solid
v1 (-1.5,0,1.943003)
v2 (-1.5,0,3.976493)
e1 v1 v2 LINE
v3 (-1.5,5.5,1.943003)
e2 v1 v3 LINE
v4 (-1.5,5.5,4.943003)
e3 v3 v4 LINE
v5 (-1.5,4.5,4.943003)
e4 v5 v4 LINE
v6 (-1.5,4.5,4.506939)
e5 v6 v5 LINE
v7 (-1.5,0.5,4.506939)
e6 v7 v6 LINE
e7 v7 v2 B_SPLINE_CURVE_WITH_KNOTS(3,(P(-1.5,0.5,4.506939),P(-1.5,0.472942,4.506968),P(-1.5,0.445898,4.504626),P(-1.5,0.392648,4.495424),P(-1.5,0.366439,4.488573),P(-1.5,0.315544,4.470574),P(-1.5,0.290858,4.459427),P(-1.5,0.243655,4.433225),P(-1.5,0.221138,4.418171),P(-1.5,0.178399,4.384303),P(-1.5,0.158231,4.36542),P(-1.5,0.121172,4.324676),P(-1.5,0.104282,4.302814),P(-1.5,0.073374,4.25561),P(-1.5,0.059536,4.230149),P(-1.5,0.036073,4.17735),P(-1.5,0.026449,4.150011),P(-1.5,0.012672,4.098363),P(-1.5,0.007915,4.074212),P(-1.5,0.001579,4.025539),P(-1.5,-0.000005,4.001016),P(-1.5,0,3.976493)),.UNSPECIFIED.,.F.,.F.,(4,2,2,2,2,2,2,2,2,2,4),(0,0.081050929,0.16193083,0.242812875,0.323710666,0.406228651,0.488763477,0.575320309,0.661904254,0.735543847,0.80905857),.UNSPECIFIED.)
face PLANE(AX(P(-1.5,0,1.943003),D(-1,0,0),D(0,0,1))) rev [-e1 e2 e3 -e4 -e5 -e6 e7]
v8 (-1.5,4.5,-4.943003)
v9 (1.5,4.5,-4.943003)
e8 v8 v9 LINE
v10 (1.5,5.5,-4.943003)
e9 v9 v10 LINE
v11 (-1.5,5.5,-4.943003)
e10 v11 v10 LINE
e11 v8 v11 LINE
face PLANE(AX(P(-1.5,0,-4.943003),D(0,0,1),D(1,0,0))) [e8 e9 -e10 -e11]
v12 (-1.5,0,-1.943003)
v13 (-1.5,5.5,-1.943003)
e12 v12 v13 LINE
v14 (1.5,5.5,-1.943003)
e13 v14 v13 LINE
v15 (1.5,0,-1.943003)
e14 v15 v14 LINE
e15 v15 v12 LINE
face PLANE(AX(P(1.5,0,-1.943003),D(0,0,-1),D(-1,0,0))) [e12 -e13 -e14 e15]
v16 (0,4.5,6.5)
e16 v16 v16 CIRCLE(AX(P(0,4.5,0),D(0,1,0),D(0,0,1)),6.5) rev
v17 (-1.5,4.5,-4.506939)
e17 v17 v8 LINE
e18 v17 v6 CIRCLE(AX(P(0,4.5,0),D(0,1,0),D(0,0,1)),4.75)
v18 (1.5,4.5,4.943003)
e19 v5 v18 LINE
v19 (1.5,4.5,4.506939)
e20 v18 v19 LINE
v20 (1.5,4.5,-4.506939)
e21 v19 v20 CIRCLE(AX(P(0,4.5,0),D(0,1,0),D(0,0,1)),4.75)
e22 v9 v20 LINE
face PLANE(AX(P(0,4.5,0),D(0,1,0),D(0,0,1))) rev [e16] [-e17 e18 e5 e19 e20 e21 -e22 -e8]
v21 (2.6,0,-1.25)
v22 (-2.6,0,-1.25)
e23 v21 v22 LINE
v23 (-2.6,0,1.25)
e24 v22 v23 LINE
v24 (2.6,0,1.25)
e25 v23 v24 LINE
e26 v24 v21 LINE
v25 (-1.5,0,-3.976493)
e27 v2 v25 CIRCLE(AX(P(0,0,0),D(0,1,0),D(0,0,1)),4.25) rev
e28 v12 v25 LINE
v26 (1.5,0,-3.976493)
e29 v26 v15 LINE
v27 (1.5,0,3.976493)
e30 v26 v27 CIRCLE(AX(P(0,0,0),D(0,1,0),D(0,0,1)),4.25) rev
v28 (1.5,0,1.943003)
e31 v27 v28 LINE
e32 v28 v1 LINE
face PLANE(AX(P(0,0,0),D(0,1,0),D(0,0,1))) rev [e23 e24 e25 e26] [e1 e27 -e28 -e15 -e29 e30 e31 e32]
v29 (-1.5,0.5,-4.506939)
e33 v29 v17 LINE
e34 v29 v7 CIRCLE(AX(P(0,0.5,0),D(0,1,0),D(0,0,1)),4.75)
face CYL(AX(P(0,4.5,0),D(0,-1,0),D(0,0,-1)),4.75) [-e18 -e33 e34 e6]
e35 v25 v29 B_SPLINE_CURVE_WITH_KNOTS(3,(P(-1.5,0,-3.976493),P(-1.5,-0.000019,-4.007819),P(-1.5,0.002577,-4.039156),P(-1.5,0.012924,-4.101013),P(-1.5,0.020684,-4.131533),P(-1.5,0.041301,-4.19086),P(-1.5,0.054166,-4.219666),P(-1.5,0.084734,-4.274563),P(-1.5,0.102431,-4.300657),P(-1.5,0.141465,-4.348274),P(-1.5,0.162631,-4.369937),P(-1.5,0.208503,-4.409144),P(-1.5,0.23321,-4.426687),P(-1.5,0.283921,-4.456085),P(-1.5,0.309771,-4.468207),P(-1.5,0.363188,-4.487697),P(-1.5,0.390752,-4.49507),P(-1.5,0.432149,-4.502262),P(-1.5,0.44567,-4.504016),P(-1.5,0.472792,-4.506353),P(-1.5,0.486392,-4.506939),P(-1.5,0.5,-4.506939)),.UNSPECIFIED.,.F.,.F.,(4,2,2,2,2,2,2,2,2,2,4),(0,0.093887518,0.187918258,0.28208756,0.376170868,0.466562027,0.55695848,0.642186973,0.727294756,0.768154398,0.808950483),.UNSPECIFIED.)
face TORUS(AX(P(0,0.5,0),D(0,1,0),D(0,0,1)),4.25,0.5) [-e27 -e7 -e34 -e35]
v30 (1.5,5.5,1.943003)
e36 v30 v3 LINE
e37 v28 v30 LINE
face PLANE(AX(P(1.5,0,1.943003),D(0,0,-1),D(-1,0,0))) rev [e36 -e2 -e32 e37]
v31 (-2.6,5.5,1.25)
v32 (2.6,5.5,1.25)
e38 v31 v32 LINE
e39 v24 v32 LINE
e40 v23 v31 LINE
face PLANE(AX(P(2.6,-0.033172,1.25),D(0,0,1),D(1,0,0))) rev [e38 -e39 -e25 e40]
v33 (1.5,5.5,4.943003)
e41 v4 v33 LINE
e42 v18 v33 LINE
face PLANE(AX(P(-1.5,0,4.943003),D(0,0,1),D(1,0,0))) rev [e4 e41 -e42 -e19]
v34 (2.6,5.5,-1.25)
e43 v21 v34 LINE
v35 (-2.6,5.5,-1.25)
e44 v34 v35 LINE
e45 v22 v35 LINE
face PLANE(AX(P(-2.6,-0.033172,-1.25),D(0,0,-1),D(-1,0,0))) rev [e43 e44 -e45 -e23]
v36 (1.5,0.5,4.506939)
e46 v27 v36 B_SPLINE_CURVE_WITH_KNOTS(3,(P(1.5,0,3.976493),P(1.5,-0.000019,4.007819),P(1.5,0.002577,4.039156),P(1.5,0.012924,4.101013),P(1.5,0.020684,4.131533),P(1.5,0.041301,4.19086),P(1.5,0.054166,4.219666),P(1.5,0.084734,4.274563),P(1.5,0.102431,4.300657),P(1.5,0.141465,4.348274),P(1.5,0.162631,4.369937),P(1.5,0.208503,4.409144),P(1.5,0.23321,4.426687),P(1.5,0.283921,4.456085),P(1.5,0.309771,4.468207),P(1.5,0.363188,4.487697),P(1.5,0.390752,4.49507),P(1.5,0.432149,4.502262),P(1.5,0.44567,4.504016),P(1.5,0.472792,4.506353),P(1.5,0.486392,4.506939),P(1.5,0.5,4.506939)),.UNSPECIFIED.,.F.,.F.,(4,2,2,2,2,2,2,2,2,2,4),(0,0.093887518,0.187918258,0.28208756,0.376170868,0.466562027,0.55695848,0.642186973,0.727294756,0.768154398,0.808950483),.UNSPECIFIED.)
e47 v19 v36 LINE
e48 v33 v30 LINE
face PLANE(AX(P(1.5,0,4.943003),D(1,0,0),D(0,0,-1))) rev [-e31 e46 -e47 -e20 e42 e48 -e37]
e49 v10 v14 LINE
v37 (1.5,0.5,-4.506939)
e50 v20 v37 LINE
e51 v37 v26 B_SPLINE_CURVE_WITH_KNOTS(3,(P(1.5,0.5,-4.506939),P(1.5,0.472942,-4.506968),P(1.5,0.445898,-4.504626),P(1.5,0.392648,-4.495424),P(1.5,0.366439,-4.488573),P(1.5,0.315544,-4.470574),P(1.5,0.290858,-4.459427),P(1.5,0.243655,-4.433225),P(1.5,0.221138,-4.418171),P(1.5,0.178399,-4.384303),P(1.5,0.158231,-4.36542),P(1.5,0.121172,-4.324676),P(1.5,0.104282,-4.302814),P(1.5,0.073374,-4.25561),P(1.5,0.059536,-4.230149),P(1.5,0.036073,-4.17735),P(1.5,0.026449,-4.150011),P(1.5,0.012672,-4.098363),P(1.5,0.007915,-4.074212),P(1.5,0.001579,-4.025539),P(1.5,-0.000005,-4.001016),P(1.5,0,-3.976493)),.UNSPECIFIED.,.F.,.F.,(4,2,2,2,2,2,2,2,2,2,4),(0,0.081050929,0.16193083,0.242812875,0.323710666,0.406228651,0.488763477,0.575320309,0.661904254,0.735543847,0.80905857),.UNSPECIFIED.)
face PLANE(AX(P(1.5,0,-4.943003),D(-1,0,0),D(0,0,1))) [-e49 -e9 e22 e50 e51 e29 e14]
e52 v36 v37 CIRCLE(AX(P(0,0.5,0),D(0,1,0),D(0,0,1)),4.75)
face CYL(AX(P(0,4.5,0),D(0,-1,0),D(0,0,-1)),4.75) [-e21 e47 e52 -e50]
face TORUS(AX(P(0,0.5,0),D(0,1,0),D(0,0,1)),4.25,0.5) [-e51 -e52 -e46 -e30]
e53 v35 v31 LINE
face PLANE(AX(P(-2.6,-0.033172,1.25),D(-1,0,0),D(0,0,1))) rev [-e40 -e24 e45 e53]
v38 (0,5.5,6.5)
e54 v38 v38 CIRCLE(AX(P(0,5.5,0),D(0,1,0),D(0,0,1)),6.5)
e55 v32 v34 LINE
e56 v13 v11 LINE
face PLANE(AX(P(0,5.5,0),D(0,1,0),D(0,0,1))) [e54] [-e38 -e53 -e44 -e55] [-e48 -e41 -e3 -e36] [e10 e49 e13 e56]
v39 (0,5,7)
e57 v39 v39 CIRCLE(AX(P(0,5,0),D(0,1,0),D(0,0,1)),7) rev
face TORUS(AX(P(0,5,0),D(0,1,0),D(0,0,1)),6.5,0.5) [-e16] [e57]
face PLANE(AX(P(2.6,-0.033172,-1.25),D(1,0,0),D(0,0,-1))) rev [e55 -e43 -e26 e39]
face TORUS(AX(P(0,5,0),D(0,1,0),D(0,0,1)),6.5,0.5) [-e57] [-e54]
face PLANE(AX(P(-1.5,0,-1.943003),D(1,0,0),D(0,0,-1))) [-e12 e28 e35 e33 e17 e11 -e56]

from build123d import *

# Parameters (mm, degrees)
SKETCH1_R           = 4.75
BOSS_EXTRUDE1_DEPTH = 4.5
SKETCH2_R           = 7
BOSS_EXTRUDE2_DEPTH = 1
SKETCH3_W           = 3
SKETCH3_H           = 3
CUT_EXTRUDE1_DEPTH  = 12.324751653
FILLET3_R           = 0.5
SKETCH4_W           = 5.2
SKETCH4_H           = 2.5
CUT_EXTRUDE2_DEPTH  = 12.324751763


with BuildPart() as part:
    # Sketch1 → Boss-Extrude1 (new body)
    with BuildSketch(Plane(origin=(0, 0, 0), x_dir=(1, 0, 0), z_dir=(0, 1, 0))):
        with Locations(Location((0, 0, 0), (0, 0, 270))):
            Circle(SKETCH1_R)
    extrude(amount=BOSS_EXTRUDE1_DEPTH)

    # Sketch2 → Boss-Extrude2 (add)
    with BuildSketch(Plane(origin=(0, 4.5, 0), x_dir=(1, 0, 0), z_dir=(0, 1, 0))):
        with Locations(Location((0, 0, 0), (0, 0, 270))):
            Circle(SKETCH2_R)
    extrude(amount=BOSS_EXTRUDE2_DEPTH)

    # Sketch3 → Cut-Extrude1 (cut, through all)
    with BuildSketch(Plane(origin=(0, 5.5, 0), x_dir=(1, 0, 0), z_dir=(0, 1, 0))):
        with Locations((0, 3.443002763)):
            Rectangle(SKETCH3_W, SKETCH3_H)
        with Locations((0, -3.443002763)):
            Rectangle(SKETCH3_W, SKETCH3_H)
    extrude(amount=-CUT_EXTRUDE1_DEPTH, mode=Mode.SUBTRACT)

    # Fillet3
    fillet3_edges = [part.edges().sort_by_distance(p)[0] for p in [
        (-4.75, 0, 0),
        (4.75, 0, 0),
        (0, 4.5, -7),
        (0, 5.5, -7),
    ]]
    fillet(fillet3_edges, radius=FILLET3_R - 0.0001)  # a hair under: the kernel refuses the full size

    # Sketch4 → Cut-Extrude2 (cut, through all)
    with BuildSketch(Plane(origin=(0, 5.5, 0), x_dir=(1, 0, 0), z_dir=(0, 1, 0))):
        Rectangle(SKETCH4_W, SKETCH4_H)
    extrude(amount=-CUT_EXTRUDE2_DEPTH, mode=Mode.SUBTRACT)


solid = part.part
